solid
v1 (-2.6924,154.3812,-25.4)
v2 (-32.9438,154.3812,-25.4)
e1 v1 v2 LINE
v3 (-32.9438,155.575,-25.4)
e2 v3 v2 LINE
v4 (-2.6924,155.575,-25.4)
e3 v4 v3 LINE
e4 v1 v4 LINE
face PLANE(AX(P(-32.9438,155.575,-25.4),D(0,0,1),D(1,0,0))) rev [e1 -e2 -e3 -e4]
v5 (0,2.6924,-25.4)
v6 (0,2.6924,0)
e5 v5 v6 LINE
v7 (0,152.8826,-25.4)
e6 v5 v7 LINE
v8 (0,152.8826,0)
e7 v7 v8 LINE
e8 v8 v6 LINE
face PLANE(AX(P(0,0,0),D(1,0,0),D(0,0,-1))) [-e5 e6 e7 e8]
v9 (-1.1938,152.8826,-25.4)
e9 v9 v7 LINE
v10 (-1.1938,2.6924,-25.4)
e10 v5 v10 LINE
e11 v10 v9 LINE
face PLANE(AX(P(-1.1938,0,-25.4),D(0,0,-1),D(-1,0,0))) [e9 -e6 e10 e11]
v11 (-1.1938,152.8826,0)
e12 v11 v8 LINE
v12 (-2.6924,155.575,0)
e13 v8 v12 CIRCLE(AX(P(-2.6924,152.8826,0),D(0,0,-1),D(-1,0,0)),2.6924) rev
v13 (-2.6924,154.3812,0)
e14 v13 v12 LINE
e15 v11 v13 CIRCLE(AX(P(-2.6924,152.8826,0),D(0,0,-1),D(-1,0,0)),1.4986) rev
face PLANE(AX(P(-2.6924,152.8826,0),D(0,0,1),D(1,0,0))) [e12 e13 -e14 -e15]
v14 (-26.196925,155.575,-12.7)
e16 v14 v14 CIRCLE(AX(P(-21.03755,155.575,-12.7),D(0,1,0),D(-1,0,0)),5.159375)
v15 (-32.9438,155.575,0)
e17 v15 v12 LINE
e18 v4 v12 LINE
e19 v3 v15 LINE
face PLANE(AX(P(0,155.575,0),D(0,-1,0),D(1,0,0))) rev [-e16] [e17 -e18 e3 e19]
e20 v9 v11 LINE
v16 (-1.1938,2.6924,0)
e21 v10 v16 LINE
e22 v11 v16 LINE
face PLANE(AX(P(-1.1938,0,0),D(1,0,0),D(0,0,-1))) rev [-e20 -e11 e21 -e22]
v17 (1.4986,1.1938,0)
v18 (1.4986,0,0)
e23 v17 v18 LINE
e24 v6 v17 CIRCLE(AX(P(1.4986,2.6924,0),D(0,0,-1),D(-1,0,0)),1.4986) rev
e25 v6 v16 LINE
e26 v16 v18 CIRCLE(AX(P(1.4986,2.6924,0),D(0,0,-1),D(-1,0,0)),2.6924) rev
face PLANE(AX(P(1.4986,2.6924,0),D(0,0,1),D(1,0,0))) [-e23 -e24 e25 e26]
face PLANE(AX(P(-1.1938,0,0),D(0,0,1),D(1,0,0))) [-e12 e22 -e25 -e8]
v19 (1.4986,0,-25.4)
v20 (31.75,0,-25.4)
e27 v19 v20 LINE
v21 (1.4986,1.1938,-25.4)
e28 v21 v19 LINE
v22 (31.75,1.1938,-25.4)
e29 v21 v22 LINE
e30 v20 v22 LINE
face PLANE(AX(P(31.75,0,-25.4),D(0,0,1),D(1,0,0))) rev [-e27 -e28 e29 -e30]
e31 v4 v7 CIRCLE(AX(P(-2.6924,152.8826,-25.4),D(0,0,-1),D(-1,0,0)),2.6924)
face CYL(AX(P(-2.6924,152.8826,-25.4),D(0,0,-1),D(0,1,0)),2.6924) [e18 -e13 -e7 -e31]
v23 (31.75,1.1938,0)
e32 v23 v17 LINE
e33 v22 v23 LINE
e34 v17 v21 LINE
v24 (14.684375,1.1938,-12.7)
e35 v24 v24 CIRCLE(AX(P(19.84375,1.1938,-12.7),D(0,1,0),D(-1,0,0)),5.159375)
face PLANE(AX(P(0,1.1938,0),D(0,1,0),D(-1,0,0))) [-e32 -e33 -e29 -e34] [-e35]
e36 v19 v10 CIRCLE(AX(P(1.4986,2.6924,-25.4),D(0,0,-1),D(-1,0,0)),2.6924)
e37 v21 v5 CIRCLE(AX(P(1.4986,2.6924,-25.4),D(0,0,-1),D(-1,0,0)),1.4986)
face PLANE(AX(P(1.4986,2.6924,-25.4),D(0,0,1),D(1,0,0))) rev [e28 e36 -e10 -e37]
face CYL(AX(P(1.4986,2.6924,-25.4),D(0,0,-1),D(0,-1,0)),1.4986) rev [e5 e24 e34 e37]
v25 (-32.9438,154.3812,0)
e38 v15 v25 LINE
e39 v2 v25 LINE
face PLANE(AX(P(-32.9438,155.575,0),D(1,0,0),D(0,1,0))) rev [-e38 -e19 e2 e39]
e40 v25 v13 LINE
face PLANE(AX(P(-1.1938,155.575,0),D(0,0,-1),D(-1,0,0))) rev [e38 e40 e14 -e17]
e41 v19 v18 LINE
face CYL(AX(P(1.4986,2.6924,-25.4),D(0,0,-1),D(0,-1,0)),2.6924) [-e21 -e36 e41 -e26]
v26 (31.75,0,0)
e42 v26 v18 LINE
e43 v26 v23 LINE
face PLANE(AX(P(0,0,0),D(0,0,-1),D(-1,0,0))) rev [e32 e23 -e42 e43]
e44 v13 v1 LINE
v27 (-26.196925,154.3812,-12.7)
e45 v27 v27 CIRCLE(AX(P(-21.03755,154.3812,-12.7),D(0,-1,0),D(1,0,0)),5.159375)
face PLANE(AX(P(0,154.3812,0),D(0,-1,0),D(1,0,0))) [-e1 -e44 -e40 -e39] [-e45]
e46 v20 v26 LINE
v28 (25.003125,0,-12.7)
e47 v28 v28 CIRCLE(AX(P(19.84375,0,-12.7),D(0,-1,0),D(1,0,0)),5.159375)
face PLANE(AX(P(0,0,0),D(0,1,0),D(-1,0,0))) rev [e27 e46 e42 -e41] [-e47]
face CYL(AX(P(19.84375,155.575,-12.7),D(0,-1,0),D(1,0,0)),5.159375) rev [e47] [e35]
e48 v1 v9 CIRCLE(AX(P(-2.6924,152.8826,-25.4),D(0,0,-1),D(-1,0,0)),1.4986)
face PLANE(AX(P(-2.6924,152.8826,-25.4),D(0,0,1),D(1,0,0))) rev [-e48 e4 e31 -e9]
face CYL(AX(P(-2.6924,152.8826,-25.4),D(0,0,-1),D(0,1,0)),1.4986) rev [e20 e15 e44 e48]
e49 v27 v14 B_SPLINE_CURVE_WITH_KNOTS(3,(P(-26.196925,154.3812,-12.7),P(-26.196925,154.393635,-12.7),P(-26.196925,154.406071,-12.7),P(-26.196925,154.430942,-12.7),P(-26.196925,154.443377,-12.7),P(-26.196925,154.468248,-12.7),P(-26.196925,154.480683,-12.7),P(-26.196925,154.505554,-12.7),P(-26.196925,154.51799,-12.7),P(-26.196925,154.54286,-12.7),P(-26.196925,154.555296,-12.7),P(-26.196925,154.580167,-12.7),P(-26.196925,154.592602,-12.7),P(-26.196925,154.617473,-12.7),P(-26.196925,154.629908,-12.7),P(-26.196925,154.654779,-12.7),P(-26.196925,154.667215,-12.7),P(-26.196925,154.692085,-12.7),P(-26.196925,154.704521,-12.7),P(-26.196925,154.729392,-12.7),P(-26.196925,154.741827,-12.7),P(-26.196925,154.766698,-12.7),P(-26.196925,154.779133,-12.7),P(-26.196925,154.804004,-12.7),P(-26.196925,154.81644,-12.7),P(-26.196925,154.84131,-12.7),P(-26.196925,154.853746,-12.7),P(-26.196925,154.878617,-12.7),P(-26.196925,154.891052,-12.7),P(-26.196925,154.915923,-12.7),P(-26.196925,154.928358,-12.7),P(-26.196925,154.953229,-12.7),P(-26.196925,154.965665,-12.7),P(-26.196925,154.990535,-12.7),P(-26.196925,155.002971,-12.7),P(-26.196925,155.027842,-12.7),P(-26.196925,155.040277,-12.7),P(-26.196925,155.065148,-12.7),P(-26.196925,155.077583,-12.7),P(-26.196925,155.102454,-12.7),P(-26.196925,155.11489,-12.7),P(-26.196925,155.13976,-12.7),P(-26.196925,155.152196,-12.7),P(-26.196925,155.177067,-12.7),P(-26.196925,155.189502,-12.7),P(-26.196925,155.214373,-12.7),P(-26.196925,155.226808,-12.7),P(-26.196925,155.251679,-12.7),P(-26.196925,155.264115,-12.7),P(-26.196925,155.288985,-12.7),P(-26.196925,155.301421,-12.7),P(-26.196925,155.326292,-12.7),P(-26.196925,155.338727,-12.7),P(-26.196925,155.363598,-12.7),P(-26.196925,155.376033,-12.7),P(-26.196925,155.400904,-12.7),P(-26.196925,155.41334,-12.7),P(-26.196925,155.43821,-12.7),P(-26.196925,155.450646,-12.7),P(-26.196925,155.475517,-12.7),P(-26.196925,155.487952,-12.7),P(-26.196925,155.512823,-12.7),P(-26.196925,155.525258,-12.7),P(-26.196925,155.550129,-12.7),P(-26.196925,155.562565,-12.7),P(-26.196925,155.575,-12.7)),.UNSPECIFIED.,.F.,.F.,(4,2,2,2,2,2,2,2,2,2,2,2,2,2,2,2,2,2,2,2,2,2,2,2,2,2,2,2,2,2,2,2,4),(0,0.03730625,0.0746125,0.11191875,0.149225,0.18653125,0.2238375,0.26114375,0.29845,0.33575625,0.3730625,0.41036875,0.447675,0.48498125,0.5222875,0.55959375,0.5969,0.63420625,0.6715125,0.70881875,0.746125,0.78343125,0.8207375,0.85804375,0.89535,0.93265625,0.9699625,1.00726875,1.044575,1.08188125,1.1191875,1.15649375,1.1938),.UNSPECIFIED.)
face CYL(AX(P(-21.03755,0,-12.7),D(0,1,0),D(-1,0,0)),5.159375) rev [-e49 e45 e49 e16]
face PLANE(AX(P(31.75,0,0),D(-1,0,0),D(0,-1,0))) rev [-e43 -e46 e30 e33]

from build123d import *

# Parameters (mm, degrees)
SKETCH1_W                    = 25.4
SKETCH1_H                    = 155.575
BASE_FLANGE1_DEPTH           = 1.1938
EDGE_FLANGE1_STRIP_W         = 7.7724
EDGE_FLANGE1_STRIP_H         = 1.1938
EDGE_FLANGE1_STRIP_CUT_DEPTH = 25.4
EDGE_FLANGE1_DEPTH           = 25.4
SKETCH11_R                   = 5.159375
CUT_EXTRUDE1_DEPTH           = 162.040474985
EDGE_FLANGE2_STRIP_W         = 7.7724
EDGE_FLANGE2_STRIP_H         = 1.1938
EDGE_FLANGE2_STRIP_CUT_DEPTH = 25.4
EDGE_FLANGE2_DEPTH           = 25.4
SKETCH15_R                   = 5.159375
CUT_EXTRUDE2_DEPTH           = 162.040474985


# Sheet-metal steps are written as plain solids
with BuildPart() as part:
    # Sketch1 → Base-Flange1 (new body)
    with BuildSketch(Plane(origin=(0, 0, 0), x_dir=(0, 0, -1), z_dir=(1, 0, 0))):
        with Locations((12.7, 77.7875)):
            Rectangle(SKETCH1_W, SKETCH1_H)
    extrude(amount=-BASE_FLANGE1_DEPTH)

    # Edge-Flange1 strip (across the edge) → Edge-Flange1 strip cut (cut)
    with BuildSketch(Plane(origin=(-1.1938, 155.575, 0), x_dir=(0, -1, 0), z_dir=(0, 0, -1))):
        with Locations((-1.1938, -0.5969)):
            Rectangle(EDGE_FLANGE1_STRIP_W, EDGE_FLANGE1_STRIP_H)
    extrude(amount=EDGE_FLANGE1_STRIP_CUT_DEPTH, mode=Mode.SUBTRACT)

    # Edge-Flange1 section (across the edge) → Edge-Flange1 (add)
    with BuildSketch(Plane(origin=(-1.1938, 155.575, 0), x_dir=(0, -1, 0), z_dir=(0, 0, -1))):
        with BuildLine():
            Line((0, 1.4986), (0, 31.75))
            Line((0, 31.75), (1.1938, 31.75))
            Line((1.1938, 31.75), (1.1938, 1.4986))
            ThreePointArc((1.1938, 1.4986), (1.632729778, 0.438929778), (2.6924, 0))
            Line((2.6924, 0), (2.6924, -1.1938))
            ThreePointArc((2.6924, -1.1938), (0.788585702, -0.405214298), (0, 1.4986))
        make_face()
    extrude(amount=EDGE_FLANGE1_DEPTH)

    # Sketch11 → Cut-Extrude1 (cut, through all)
    with BuildSketch(Plane(origin=(0, 155.575, 0), x_dir=(1, 0, 0), z_dir=(0, 1, 0))):
        with Locations(Location((-21.03755, 12.7, 0), (0, 0, 180))):
            Circle(SKETCH11_R)
    extrude(amount=-CUT_EXTRUDE1_DEPTH, mode=Mode.SUBTRACT)

    # Edge-Flange2 strip (across the edge) → Edge-Flange2 strip cut (cut)
    with BuildSketch(Plane.YX):
        with Locations((-1.1938, -0.5969)):
            Rectangle(EDGE_FLANGE2_STRIP_W, EDGE_FLANGE2_STRIP_H)
    extrude(amount=EDGE_FLANGE2_STRIP_CUT_DEPTH, mode=Mode.SUBTRACT)

    # Edge-Flange2 section (across the edge) → Edge-Flange2 (add)
    with BuildSketch(Plane.YX):
        with BuildLine():
            Line((0, 1.4986), (0, 31.75))
            Line((0, 31.75), (1.1938, 31.75))
            Line((1.1938, 31.75), (1.1938, 1.4986))
            ThreePointArc((1.1938, 1.4986), (1.632729778, 0.438929778), (2.6924, 0))
            Line((2.6924, 0), (2.6924, -1.1938))
            ThreePointArc((2.6924, -1.1938), (0.788585702, -0.405214298), (0, 1.4986))
        make_face()
    extrude(amount=EDGE_FLANGE2_DEPTH)

    # Sketch15 → Cut-Extrude2 (cut, through all)
    with BuildSketch(Plane.XZ):
        with Locations((19.84375, -12.7)):
            Circle(SKETCH15_R)
    extrude(amount=-CUT_EXTRUDE2_DEPTH, mode=Mode.SUBTRACT)


solid = part.part
